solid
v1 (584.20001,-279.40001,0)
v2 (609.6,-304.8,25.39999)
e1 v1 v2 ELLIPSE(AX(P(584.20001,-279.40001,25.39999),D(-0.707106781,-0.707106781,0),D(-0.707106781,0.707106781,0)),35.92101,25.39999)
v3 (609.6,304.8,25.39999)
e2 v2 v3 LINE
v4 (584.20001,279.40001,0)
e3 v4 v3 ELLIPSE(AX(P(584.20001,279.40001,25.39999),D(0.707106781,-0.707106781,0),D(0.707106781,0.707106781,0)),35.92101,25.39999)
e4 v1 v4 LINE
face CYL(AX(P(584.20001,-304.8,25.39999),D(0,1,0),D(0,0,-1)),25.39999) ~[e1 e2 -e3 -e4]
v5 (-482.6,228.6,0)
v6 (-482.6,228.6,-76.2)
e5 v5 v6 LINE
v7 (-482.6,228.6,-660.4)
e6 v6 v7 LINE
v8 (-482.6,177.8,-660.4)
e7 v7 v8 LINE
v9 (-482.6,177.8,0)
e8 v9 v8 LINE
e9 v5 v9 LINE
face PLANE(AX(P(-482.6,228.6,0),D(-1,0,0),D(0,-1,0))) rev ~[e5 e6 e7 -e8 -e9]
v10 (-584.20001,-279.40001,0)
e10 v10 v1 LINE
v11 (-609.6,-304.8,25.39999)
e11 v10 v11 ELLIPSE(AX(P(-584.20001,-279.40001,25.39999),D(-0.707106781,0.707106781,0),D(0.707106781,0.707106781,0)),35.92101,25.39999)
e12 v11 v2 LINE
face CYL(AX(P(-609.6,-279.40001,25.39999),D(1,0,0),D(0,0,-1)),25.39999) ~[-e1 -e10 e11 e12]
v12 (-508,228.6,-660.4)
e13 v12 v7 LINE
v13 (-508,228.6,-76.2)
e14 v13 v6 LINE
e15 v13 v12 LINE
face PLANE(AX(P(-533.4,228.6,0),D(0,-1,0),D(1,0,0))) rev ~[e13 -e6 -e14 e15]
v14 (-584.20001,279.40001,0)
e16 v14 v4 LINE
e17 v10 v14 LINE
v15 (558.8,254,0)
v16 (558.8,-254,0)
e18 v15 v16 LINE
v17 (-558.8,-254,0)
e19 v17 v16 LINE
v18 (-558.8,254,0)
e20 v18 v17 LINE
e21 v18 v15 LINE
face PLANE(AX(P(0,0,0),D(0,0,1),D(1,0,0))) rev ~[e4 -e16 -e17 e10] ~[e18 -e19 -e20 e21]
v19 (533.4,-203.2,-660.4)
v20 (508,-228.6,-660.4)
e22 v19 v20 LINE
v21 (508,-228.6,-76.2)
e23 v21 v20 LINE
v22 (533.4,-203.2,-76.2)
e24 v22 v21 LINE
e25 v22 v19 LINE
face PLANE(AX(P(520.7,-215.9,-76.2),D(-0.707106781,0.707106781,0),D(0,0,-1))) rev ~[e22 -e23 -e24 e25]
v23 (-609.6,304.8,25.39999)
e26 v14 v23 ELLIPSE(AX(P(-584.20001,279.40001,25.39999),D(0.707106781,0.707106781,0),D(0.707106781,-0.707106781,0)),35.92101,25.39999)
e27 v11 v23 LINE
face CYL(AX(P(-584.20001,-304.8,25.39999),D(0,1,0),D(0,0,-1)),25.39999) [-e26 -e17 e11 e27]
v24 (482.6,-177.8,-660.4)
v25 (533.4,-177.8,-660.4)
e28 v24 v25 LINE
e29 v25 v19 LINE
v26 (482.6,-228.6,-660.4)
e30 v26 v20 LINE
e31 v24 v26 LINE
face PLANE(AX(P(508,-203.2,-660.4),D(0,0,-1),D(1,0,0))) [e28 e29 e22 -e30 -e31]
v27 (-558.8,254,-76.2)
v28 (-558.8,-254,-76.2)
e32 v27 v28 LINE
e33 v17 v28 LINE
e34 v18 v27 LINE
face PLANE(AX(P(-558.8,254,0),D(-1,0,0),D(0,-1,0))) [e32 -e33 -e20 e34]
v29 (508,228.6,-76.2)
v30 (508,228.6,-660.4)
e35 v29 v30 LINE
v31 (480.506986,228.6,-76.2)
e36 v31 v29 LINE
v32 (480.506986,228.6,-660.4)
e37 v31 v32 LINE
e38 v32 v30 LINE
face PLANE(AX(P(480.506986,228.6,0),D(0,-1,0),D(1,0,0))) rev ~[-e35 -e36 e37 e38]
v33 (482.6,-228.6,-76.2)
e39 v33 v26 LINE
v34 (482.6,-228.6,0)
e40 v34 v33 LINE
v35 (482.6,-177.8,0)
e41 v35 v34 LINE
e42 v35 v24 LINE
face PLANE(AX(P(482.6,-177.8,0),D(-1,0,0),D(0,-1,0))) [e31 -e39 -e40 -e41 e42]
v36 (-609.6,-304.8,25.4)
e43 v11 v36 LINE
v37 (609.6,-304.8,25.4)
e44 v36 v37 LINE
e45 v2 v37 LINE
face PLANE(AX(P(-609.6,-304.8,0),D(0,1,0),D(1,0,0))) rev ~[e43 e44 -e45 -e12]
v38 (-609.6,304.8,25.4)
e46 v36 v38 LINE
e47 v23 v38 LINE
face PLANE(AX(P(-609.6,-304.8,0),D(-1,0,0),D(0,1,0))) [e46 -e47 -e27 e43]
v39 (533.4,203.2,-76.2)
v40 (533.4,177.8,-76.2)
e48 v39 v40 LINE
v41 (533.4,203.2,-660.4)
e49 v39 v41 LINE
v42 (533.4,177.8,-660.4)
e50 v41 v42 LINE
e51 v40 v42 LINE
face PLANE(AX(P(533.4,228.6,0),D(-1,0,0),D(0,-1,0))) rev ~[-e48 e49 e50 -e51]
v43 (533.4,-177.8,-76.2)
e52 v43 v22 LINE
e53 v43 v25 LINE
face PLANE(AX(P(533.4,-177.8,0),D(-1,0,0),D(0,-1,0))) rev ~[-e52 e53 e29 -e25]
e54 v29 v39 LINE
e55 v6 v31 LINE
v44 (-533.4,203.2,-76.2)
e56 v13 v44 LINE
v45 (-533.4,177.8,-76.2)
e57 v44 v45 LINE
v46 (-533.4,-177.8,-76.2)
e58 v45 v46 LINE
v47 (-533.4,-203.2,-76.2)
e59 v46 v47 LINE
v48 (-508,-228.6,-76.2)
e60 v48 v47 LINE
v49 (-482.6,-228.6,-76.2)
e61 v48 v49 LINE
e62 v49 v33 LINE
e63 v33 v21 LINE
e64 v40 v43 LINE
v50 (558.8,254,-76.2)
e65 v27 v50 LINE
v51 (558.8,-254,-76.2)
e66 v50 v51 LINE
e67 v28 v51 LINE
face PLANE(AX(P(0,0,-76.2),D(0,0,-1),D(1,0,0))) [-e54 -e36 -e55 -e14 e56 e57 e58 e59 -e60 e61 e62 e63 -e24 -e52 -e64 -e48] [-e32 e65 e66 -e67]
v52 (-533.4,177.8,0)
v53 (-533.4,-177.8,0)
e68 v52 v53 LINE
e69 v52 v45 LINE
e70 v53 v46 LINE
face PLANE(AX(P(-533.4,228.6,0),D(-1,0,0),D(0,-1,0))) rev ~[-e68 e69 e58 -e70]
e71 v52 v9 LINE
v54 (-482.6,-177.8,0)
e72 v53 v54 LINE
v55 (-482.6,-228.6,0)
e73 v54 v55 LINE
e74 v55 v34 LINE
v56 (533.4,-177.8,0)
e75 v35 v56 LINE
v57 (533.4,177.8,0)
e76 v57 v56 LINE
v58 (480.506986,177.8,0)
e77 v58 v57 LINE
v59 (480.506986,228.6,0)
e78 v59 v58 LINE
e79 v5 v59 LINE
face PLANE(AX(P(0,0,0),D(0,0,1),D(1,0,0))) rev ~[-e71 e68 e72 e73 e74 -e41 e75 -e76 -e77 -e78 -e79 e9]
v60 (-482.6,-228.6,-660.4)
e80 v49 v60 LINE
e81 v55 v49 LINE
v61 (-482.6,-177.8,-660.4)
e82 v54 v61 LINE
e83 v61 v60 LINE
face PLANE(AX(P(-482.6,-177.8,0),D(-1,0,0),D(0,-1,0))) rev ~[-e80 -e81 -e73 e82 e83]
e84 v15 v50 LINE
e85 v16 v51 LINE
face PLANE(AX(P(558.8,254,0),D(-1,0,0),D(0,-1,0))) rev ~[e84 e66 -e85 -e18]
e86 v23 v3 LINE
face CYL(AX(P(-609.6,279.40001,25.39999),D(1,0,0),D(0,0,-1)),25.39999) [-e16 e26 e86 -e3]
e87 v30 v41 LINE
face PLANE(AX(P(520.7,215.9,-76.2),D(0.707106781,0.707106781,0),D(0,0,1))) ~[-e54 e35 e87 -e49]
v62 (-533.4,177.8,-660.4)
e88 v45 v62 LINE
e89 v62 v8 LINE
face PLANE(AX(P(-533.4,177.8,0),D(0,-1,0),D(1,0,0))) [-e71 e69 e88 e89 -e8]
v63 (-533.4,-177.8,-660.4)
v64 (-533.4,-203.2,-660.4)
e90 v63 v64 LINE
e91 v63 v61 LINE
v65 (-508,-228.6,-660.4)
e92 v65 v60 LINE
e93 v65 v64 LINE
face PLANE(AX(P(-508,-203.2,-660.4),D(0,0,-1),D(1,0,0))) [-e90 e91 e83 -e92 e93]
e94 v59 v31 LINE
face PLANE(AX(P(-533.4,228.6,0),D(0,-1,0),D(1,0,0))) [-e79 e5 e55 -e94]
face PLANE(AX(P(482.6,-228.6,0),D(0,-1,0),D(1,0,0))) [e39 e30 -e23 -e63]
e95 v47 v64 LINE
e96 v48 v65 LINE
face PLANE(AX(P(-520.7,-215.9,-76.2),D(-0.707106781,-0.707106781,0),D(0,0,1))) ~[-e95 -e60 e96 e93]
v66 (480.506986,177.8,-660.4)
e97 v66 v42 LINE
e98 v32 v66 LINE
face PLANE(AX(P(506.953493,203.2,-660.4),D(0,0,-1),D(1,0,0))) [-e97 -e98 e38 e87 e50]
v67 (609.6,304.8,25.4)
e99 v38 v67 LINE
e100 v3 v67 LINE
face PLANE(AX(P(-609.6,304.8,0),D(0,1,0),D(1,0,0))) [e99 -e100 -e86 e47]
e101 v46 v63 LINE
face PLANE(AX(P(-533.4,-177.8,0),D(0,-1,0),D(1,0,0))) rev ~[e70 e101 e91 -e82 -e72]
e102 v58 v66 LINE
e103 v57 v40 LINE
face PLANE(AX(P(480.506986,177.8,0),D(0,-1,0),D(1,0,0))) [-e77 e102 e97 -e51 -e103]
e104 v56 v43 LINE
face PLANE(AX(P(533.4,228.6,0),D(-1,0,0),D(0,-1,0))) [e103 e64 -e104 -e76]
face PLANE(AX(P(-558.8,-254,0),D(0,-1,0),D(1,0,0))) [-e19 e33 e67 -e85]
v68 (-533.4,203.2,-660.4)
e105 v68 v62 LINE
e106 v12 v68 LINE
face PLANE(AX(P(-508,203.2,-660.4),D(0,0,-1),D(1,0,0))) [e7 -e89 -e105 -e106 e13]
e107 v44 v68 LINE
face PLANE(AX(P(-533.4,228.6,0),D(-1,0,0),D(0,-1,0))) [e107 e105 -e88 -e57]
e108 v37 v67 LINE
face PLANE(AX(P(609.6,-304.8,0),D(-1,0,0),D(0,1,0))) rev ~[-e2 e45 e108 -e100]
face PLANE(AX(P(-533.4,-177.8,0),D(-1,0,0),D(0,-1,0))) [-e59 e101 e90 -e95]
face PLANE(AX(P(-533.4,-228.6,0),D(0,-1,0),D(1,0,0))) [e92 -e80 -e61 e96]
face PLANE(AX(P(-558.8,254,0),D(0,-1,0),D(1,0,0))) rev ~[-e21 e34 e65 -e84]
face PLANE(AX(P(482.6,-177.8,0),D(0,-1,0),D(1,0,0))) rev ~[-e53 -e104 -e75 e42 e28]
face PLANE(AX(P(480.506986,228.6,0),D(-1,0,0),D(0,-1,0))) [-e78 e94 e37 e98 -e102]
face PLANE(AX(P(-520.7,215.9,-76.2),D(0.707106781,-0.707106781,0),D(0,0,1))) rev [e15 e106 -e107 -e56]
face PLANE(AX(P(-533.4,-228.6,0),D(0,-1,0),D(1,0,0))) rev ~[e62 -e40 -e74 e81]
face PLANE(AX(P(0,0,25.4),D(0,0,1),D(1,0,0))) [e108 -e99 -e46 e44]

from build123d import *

# Parameters (mm, degrees)
F0_W     = 1219.2
F0_H     = 609.6
F1_DEPTH = 25.4
F2_W     = 1117.6
F2_H     = 508
F2_W_2   = 1066.8
F2_H_2   = 457.2
F3_DEPTH = 76.2
F4_W     = 50.8
F4_H     = 50.8
F4_W_2   = 52.8930136204
F5_DEPTH = 660.4
F6_R     = 25.39999
F7_SIZE  = 25.4


# Not quite as in the source:
# - a fillet or chamfer is up to 0.001 mm smaller than in the source, because OpenCascade refuses the exact size


with BuildPart() as f1:
    # F0 (on Top) → F1 (new body)
    with BuildSketch(Plane.XY):
        Rectangle(F0_W, F0_H)
    extrude(amount=F1_DEPTH)

    # F2 (on face) → F3 (join)
    with BuildSketch(Plane(origin=(0, 0, 0), x_dir=(1, 0, 0), z_dir=(0, 0, -1))):
        Rectangle(F2_W, F2_H)
        Rectangle(F2_W_2, F2_H_2, mode=Mode.SUBTRACT)
    extrude(amount=F3_DEPTH)

    # F4 (on face) → F5 (join)
    with BuildSketch(Plane(origin=(0, 0, 0), x_dir=(1, 0, 0), z_dir=(0, 0, -1))):
        with Locations((-508, 203.2)):
            Rectangle(F4_W, F4_H)
        with Locations((-508, -203.2)):
            Rectangle(F4_W, F4_H)
        with Locations((506.9534931898, -203.2)):
            Rectangle(F4_W_2, F4_H)
        with Locations((508, 203.2)):
            Rectangle(F4_W, F4_H)
    extrude(amount=F5_DEPTH)

    # F6 (radius 25.4 in the source; OpenCascade refuses exactly that, so slightly less here)
    f6_edges = [f1.edges().sort_by_distance(p)[0] for p in [
        (0, 304.8, 0),
        (-609.6, 0, 0),
        (609.6, 0, 0),
        (0, -304.8, 0),
    ]]
    fillet(f6_edges, radius=F6_R)

    # F7
    f7_edges = [f1.edges().sort_by_distance(p)[0] for p in [
        (-533.4, -228.6, -368.3),
        (-533.4, 228.6, -368.3),
        (533.4, 228.6, -368.3),
        (533.4, -228.6, -368.3),
    ]]
    chamfer(f7_edges, length=F7_SIZE)


solid = f1.part
